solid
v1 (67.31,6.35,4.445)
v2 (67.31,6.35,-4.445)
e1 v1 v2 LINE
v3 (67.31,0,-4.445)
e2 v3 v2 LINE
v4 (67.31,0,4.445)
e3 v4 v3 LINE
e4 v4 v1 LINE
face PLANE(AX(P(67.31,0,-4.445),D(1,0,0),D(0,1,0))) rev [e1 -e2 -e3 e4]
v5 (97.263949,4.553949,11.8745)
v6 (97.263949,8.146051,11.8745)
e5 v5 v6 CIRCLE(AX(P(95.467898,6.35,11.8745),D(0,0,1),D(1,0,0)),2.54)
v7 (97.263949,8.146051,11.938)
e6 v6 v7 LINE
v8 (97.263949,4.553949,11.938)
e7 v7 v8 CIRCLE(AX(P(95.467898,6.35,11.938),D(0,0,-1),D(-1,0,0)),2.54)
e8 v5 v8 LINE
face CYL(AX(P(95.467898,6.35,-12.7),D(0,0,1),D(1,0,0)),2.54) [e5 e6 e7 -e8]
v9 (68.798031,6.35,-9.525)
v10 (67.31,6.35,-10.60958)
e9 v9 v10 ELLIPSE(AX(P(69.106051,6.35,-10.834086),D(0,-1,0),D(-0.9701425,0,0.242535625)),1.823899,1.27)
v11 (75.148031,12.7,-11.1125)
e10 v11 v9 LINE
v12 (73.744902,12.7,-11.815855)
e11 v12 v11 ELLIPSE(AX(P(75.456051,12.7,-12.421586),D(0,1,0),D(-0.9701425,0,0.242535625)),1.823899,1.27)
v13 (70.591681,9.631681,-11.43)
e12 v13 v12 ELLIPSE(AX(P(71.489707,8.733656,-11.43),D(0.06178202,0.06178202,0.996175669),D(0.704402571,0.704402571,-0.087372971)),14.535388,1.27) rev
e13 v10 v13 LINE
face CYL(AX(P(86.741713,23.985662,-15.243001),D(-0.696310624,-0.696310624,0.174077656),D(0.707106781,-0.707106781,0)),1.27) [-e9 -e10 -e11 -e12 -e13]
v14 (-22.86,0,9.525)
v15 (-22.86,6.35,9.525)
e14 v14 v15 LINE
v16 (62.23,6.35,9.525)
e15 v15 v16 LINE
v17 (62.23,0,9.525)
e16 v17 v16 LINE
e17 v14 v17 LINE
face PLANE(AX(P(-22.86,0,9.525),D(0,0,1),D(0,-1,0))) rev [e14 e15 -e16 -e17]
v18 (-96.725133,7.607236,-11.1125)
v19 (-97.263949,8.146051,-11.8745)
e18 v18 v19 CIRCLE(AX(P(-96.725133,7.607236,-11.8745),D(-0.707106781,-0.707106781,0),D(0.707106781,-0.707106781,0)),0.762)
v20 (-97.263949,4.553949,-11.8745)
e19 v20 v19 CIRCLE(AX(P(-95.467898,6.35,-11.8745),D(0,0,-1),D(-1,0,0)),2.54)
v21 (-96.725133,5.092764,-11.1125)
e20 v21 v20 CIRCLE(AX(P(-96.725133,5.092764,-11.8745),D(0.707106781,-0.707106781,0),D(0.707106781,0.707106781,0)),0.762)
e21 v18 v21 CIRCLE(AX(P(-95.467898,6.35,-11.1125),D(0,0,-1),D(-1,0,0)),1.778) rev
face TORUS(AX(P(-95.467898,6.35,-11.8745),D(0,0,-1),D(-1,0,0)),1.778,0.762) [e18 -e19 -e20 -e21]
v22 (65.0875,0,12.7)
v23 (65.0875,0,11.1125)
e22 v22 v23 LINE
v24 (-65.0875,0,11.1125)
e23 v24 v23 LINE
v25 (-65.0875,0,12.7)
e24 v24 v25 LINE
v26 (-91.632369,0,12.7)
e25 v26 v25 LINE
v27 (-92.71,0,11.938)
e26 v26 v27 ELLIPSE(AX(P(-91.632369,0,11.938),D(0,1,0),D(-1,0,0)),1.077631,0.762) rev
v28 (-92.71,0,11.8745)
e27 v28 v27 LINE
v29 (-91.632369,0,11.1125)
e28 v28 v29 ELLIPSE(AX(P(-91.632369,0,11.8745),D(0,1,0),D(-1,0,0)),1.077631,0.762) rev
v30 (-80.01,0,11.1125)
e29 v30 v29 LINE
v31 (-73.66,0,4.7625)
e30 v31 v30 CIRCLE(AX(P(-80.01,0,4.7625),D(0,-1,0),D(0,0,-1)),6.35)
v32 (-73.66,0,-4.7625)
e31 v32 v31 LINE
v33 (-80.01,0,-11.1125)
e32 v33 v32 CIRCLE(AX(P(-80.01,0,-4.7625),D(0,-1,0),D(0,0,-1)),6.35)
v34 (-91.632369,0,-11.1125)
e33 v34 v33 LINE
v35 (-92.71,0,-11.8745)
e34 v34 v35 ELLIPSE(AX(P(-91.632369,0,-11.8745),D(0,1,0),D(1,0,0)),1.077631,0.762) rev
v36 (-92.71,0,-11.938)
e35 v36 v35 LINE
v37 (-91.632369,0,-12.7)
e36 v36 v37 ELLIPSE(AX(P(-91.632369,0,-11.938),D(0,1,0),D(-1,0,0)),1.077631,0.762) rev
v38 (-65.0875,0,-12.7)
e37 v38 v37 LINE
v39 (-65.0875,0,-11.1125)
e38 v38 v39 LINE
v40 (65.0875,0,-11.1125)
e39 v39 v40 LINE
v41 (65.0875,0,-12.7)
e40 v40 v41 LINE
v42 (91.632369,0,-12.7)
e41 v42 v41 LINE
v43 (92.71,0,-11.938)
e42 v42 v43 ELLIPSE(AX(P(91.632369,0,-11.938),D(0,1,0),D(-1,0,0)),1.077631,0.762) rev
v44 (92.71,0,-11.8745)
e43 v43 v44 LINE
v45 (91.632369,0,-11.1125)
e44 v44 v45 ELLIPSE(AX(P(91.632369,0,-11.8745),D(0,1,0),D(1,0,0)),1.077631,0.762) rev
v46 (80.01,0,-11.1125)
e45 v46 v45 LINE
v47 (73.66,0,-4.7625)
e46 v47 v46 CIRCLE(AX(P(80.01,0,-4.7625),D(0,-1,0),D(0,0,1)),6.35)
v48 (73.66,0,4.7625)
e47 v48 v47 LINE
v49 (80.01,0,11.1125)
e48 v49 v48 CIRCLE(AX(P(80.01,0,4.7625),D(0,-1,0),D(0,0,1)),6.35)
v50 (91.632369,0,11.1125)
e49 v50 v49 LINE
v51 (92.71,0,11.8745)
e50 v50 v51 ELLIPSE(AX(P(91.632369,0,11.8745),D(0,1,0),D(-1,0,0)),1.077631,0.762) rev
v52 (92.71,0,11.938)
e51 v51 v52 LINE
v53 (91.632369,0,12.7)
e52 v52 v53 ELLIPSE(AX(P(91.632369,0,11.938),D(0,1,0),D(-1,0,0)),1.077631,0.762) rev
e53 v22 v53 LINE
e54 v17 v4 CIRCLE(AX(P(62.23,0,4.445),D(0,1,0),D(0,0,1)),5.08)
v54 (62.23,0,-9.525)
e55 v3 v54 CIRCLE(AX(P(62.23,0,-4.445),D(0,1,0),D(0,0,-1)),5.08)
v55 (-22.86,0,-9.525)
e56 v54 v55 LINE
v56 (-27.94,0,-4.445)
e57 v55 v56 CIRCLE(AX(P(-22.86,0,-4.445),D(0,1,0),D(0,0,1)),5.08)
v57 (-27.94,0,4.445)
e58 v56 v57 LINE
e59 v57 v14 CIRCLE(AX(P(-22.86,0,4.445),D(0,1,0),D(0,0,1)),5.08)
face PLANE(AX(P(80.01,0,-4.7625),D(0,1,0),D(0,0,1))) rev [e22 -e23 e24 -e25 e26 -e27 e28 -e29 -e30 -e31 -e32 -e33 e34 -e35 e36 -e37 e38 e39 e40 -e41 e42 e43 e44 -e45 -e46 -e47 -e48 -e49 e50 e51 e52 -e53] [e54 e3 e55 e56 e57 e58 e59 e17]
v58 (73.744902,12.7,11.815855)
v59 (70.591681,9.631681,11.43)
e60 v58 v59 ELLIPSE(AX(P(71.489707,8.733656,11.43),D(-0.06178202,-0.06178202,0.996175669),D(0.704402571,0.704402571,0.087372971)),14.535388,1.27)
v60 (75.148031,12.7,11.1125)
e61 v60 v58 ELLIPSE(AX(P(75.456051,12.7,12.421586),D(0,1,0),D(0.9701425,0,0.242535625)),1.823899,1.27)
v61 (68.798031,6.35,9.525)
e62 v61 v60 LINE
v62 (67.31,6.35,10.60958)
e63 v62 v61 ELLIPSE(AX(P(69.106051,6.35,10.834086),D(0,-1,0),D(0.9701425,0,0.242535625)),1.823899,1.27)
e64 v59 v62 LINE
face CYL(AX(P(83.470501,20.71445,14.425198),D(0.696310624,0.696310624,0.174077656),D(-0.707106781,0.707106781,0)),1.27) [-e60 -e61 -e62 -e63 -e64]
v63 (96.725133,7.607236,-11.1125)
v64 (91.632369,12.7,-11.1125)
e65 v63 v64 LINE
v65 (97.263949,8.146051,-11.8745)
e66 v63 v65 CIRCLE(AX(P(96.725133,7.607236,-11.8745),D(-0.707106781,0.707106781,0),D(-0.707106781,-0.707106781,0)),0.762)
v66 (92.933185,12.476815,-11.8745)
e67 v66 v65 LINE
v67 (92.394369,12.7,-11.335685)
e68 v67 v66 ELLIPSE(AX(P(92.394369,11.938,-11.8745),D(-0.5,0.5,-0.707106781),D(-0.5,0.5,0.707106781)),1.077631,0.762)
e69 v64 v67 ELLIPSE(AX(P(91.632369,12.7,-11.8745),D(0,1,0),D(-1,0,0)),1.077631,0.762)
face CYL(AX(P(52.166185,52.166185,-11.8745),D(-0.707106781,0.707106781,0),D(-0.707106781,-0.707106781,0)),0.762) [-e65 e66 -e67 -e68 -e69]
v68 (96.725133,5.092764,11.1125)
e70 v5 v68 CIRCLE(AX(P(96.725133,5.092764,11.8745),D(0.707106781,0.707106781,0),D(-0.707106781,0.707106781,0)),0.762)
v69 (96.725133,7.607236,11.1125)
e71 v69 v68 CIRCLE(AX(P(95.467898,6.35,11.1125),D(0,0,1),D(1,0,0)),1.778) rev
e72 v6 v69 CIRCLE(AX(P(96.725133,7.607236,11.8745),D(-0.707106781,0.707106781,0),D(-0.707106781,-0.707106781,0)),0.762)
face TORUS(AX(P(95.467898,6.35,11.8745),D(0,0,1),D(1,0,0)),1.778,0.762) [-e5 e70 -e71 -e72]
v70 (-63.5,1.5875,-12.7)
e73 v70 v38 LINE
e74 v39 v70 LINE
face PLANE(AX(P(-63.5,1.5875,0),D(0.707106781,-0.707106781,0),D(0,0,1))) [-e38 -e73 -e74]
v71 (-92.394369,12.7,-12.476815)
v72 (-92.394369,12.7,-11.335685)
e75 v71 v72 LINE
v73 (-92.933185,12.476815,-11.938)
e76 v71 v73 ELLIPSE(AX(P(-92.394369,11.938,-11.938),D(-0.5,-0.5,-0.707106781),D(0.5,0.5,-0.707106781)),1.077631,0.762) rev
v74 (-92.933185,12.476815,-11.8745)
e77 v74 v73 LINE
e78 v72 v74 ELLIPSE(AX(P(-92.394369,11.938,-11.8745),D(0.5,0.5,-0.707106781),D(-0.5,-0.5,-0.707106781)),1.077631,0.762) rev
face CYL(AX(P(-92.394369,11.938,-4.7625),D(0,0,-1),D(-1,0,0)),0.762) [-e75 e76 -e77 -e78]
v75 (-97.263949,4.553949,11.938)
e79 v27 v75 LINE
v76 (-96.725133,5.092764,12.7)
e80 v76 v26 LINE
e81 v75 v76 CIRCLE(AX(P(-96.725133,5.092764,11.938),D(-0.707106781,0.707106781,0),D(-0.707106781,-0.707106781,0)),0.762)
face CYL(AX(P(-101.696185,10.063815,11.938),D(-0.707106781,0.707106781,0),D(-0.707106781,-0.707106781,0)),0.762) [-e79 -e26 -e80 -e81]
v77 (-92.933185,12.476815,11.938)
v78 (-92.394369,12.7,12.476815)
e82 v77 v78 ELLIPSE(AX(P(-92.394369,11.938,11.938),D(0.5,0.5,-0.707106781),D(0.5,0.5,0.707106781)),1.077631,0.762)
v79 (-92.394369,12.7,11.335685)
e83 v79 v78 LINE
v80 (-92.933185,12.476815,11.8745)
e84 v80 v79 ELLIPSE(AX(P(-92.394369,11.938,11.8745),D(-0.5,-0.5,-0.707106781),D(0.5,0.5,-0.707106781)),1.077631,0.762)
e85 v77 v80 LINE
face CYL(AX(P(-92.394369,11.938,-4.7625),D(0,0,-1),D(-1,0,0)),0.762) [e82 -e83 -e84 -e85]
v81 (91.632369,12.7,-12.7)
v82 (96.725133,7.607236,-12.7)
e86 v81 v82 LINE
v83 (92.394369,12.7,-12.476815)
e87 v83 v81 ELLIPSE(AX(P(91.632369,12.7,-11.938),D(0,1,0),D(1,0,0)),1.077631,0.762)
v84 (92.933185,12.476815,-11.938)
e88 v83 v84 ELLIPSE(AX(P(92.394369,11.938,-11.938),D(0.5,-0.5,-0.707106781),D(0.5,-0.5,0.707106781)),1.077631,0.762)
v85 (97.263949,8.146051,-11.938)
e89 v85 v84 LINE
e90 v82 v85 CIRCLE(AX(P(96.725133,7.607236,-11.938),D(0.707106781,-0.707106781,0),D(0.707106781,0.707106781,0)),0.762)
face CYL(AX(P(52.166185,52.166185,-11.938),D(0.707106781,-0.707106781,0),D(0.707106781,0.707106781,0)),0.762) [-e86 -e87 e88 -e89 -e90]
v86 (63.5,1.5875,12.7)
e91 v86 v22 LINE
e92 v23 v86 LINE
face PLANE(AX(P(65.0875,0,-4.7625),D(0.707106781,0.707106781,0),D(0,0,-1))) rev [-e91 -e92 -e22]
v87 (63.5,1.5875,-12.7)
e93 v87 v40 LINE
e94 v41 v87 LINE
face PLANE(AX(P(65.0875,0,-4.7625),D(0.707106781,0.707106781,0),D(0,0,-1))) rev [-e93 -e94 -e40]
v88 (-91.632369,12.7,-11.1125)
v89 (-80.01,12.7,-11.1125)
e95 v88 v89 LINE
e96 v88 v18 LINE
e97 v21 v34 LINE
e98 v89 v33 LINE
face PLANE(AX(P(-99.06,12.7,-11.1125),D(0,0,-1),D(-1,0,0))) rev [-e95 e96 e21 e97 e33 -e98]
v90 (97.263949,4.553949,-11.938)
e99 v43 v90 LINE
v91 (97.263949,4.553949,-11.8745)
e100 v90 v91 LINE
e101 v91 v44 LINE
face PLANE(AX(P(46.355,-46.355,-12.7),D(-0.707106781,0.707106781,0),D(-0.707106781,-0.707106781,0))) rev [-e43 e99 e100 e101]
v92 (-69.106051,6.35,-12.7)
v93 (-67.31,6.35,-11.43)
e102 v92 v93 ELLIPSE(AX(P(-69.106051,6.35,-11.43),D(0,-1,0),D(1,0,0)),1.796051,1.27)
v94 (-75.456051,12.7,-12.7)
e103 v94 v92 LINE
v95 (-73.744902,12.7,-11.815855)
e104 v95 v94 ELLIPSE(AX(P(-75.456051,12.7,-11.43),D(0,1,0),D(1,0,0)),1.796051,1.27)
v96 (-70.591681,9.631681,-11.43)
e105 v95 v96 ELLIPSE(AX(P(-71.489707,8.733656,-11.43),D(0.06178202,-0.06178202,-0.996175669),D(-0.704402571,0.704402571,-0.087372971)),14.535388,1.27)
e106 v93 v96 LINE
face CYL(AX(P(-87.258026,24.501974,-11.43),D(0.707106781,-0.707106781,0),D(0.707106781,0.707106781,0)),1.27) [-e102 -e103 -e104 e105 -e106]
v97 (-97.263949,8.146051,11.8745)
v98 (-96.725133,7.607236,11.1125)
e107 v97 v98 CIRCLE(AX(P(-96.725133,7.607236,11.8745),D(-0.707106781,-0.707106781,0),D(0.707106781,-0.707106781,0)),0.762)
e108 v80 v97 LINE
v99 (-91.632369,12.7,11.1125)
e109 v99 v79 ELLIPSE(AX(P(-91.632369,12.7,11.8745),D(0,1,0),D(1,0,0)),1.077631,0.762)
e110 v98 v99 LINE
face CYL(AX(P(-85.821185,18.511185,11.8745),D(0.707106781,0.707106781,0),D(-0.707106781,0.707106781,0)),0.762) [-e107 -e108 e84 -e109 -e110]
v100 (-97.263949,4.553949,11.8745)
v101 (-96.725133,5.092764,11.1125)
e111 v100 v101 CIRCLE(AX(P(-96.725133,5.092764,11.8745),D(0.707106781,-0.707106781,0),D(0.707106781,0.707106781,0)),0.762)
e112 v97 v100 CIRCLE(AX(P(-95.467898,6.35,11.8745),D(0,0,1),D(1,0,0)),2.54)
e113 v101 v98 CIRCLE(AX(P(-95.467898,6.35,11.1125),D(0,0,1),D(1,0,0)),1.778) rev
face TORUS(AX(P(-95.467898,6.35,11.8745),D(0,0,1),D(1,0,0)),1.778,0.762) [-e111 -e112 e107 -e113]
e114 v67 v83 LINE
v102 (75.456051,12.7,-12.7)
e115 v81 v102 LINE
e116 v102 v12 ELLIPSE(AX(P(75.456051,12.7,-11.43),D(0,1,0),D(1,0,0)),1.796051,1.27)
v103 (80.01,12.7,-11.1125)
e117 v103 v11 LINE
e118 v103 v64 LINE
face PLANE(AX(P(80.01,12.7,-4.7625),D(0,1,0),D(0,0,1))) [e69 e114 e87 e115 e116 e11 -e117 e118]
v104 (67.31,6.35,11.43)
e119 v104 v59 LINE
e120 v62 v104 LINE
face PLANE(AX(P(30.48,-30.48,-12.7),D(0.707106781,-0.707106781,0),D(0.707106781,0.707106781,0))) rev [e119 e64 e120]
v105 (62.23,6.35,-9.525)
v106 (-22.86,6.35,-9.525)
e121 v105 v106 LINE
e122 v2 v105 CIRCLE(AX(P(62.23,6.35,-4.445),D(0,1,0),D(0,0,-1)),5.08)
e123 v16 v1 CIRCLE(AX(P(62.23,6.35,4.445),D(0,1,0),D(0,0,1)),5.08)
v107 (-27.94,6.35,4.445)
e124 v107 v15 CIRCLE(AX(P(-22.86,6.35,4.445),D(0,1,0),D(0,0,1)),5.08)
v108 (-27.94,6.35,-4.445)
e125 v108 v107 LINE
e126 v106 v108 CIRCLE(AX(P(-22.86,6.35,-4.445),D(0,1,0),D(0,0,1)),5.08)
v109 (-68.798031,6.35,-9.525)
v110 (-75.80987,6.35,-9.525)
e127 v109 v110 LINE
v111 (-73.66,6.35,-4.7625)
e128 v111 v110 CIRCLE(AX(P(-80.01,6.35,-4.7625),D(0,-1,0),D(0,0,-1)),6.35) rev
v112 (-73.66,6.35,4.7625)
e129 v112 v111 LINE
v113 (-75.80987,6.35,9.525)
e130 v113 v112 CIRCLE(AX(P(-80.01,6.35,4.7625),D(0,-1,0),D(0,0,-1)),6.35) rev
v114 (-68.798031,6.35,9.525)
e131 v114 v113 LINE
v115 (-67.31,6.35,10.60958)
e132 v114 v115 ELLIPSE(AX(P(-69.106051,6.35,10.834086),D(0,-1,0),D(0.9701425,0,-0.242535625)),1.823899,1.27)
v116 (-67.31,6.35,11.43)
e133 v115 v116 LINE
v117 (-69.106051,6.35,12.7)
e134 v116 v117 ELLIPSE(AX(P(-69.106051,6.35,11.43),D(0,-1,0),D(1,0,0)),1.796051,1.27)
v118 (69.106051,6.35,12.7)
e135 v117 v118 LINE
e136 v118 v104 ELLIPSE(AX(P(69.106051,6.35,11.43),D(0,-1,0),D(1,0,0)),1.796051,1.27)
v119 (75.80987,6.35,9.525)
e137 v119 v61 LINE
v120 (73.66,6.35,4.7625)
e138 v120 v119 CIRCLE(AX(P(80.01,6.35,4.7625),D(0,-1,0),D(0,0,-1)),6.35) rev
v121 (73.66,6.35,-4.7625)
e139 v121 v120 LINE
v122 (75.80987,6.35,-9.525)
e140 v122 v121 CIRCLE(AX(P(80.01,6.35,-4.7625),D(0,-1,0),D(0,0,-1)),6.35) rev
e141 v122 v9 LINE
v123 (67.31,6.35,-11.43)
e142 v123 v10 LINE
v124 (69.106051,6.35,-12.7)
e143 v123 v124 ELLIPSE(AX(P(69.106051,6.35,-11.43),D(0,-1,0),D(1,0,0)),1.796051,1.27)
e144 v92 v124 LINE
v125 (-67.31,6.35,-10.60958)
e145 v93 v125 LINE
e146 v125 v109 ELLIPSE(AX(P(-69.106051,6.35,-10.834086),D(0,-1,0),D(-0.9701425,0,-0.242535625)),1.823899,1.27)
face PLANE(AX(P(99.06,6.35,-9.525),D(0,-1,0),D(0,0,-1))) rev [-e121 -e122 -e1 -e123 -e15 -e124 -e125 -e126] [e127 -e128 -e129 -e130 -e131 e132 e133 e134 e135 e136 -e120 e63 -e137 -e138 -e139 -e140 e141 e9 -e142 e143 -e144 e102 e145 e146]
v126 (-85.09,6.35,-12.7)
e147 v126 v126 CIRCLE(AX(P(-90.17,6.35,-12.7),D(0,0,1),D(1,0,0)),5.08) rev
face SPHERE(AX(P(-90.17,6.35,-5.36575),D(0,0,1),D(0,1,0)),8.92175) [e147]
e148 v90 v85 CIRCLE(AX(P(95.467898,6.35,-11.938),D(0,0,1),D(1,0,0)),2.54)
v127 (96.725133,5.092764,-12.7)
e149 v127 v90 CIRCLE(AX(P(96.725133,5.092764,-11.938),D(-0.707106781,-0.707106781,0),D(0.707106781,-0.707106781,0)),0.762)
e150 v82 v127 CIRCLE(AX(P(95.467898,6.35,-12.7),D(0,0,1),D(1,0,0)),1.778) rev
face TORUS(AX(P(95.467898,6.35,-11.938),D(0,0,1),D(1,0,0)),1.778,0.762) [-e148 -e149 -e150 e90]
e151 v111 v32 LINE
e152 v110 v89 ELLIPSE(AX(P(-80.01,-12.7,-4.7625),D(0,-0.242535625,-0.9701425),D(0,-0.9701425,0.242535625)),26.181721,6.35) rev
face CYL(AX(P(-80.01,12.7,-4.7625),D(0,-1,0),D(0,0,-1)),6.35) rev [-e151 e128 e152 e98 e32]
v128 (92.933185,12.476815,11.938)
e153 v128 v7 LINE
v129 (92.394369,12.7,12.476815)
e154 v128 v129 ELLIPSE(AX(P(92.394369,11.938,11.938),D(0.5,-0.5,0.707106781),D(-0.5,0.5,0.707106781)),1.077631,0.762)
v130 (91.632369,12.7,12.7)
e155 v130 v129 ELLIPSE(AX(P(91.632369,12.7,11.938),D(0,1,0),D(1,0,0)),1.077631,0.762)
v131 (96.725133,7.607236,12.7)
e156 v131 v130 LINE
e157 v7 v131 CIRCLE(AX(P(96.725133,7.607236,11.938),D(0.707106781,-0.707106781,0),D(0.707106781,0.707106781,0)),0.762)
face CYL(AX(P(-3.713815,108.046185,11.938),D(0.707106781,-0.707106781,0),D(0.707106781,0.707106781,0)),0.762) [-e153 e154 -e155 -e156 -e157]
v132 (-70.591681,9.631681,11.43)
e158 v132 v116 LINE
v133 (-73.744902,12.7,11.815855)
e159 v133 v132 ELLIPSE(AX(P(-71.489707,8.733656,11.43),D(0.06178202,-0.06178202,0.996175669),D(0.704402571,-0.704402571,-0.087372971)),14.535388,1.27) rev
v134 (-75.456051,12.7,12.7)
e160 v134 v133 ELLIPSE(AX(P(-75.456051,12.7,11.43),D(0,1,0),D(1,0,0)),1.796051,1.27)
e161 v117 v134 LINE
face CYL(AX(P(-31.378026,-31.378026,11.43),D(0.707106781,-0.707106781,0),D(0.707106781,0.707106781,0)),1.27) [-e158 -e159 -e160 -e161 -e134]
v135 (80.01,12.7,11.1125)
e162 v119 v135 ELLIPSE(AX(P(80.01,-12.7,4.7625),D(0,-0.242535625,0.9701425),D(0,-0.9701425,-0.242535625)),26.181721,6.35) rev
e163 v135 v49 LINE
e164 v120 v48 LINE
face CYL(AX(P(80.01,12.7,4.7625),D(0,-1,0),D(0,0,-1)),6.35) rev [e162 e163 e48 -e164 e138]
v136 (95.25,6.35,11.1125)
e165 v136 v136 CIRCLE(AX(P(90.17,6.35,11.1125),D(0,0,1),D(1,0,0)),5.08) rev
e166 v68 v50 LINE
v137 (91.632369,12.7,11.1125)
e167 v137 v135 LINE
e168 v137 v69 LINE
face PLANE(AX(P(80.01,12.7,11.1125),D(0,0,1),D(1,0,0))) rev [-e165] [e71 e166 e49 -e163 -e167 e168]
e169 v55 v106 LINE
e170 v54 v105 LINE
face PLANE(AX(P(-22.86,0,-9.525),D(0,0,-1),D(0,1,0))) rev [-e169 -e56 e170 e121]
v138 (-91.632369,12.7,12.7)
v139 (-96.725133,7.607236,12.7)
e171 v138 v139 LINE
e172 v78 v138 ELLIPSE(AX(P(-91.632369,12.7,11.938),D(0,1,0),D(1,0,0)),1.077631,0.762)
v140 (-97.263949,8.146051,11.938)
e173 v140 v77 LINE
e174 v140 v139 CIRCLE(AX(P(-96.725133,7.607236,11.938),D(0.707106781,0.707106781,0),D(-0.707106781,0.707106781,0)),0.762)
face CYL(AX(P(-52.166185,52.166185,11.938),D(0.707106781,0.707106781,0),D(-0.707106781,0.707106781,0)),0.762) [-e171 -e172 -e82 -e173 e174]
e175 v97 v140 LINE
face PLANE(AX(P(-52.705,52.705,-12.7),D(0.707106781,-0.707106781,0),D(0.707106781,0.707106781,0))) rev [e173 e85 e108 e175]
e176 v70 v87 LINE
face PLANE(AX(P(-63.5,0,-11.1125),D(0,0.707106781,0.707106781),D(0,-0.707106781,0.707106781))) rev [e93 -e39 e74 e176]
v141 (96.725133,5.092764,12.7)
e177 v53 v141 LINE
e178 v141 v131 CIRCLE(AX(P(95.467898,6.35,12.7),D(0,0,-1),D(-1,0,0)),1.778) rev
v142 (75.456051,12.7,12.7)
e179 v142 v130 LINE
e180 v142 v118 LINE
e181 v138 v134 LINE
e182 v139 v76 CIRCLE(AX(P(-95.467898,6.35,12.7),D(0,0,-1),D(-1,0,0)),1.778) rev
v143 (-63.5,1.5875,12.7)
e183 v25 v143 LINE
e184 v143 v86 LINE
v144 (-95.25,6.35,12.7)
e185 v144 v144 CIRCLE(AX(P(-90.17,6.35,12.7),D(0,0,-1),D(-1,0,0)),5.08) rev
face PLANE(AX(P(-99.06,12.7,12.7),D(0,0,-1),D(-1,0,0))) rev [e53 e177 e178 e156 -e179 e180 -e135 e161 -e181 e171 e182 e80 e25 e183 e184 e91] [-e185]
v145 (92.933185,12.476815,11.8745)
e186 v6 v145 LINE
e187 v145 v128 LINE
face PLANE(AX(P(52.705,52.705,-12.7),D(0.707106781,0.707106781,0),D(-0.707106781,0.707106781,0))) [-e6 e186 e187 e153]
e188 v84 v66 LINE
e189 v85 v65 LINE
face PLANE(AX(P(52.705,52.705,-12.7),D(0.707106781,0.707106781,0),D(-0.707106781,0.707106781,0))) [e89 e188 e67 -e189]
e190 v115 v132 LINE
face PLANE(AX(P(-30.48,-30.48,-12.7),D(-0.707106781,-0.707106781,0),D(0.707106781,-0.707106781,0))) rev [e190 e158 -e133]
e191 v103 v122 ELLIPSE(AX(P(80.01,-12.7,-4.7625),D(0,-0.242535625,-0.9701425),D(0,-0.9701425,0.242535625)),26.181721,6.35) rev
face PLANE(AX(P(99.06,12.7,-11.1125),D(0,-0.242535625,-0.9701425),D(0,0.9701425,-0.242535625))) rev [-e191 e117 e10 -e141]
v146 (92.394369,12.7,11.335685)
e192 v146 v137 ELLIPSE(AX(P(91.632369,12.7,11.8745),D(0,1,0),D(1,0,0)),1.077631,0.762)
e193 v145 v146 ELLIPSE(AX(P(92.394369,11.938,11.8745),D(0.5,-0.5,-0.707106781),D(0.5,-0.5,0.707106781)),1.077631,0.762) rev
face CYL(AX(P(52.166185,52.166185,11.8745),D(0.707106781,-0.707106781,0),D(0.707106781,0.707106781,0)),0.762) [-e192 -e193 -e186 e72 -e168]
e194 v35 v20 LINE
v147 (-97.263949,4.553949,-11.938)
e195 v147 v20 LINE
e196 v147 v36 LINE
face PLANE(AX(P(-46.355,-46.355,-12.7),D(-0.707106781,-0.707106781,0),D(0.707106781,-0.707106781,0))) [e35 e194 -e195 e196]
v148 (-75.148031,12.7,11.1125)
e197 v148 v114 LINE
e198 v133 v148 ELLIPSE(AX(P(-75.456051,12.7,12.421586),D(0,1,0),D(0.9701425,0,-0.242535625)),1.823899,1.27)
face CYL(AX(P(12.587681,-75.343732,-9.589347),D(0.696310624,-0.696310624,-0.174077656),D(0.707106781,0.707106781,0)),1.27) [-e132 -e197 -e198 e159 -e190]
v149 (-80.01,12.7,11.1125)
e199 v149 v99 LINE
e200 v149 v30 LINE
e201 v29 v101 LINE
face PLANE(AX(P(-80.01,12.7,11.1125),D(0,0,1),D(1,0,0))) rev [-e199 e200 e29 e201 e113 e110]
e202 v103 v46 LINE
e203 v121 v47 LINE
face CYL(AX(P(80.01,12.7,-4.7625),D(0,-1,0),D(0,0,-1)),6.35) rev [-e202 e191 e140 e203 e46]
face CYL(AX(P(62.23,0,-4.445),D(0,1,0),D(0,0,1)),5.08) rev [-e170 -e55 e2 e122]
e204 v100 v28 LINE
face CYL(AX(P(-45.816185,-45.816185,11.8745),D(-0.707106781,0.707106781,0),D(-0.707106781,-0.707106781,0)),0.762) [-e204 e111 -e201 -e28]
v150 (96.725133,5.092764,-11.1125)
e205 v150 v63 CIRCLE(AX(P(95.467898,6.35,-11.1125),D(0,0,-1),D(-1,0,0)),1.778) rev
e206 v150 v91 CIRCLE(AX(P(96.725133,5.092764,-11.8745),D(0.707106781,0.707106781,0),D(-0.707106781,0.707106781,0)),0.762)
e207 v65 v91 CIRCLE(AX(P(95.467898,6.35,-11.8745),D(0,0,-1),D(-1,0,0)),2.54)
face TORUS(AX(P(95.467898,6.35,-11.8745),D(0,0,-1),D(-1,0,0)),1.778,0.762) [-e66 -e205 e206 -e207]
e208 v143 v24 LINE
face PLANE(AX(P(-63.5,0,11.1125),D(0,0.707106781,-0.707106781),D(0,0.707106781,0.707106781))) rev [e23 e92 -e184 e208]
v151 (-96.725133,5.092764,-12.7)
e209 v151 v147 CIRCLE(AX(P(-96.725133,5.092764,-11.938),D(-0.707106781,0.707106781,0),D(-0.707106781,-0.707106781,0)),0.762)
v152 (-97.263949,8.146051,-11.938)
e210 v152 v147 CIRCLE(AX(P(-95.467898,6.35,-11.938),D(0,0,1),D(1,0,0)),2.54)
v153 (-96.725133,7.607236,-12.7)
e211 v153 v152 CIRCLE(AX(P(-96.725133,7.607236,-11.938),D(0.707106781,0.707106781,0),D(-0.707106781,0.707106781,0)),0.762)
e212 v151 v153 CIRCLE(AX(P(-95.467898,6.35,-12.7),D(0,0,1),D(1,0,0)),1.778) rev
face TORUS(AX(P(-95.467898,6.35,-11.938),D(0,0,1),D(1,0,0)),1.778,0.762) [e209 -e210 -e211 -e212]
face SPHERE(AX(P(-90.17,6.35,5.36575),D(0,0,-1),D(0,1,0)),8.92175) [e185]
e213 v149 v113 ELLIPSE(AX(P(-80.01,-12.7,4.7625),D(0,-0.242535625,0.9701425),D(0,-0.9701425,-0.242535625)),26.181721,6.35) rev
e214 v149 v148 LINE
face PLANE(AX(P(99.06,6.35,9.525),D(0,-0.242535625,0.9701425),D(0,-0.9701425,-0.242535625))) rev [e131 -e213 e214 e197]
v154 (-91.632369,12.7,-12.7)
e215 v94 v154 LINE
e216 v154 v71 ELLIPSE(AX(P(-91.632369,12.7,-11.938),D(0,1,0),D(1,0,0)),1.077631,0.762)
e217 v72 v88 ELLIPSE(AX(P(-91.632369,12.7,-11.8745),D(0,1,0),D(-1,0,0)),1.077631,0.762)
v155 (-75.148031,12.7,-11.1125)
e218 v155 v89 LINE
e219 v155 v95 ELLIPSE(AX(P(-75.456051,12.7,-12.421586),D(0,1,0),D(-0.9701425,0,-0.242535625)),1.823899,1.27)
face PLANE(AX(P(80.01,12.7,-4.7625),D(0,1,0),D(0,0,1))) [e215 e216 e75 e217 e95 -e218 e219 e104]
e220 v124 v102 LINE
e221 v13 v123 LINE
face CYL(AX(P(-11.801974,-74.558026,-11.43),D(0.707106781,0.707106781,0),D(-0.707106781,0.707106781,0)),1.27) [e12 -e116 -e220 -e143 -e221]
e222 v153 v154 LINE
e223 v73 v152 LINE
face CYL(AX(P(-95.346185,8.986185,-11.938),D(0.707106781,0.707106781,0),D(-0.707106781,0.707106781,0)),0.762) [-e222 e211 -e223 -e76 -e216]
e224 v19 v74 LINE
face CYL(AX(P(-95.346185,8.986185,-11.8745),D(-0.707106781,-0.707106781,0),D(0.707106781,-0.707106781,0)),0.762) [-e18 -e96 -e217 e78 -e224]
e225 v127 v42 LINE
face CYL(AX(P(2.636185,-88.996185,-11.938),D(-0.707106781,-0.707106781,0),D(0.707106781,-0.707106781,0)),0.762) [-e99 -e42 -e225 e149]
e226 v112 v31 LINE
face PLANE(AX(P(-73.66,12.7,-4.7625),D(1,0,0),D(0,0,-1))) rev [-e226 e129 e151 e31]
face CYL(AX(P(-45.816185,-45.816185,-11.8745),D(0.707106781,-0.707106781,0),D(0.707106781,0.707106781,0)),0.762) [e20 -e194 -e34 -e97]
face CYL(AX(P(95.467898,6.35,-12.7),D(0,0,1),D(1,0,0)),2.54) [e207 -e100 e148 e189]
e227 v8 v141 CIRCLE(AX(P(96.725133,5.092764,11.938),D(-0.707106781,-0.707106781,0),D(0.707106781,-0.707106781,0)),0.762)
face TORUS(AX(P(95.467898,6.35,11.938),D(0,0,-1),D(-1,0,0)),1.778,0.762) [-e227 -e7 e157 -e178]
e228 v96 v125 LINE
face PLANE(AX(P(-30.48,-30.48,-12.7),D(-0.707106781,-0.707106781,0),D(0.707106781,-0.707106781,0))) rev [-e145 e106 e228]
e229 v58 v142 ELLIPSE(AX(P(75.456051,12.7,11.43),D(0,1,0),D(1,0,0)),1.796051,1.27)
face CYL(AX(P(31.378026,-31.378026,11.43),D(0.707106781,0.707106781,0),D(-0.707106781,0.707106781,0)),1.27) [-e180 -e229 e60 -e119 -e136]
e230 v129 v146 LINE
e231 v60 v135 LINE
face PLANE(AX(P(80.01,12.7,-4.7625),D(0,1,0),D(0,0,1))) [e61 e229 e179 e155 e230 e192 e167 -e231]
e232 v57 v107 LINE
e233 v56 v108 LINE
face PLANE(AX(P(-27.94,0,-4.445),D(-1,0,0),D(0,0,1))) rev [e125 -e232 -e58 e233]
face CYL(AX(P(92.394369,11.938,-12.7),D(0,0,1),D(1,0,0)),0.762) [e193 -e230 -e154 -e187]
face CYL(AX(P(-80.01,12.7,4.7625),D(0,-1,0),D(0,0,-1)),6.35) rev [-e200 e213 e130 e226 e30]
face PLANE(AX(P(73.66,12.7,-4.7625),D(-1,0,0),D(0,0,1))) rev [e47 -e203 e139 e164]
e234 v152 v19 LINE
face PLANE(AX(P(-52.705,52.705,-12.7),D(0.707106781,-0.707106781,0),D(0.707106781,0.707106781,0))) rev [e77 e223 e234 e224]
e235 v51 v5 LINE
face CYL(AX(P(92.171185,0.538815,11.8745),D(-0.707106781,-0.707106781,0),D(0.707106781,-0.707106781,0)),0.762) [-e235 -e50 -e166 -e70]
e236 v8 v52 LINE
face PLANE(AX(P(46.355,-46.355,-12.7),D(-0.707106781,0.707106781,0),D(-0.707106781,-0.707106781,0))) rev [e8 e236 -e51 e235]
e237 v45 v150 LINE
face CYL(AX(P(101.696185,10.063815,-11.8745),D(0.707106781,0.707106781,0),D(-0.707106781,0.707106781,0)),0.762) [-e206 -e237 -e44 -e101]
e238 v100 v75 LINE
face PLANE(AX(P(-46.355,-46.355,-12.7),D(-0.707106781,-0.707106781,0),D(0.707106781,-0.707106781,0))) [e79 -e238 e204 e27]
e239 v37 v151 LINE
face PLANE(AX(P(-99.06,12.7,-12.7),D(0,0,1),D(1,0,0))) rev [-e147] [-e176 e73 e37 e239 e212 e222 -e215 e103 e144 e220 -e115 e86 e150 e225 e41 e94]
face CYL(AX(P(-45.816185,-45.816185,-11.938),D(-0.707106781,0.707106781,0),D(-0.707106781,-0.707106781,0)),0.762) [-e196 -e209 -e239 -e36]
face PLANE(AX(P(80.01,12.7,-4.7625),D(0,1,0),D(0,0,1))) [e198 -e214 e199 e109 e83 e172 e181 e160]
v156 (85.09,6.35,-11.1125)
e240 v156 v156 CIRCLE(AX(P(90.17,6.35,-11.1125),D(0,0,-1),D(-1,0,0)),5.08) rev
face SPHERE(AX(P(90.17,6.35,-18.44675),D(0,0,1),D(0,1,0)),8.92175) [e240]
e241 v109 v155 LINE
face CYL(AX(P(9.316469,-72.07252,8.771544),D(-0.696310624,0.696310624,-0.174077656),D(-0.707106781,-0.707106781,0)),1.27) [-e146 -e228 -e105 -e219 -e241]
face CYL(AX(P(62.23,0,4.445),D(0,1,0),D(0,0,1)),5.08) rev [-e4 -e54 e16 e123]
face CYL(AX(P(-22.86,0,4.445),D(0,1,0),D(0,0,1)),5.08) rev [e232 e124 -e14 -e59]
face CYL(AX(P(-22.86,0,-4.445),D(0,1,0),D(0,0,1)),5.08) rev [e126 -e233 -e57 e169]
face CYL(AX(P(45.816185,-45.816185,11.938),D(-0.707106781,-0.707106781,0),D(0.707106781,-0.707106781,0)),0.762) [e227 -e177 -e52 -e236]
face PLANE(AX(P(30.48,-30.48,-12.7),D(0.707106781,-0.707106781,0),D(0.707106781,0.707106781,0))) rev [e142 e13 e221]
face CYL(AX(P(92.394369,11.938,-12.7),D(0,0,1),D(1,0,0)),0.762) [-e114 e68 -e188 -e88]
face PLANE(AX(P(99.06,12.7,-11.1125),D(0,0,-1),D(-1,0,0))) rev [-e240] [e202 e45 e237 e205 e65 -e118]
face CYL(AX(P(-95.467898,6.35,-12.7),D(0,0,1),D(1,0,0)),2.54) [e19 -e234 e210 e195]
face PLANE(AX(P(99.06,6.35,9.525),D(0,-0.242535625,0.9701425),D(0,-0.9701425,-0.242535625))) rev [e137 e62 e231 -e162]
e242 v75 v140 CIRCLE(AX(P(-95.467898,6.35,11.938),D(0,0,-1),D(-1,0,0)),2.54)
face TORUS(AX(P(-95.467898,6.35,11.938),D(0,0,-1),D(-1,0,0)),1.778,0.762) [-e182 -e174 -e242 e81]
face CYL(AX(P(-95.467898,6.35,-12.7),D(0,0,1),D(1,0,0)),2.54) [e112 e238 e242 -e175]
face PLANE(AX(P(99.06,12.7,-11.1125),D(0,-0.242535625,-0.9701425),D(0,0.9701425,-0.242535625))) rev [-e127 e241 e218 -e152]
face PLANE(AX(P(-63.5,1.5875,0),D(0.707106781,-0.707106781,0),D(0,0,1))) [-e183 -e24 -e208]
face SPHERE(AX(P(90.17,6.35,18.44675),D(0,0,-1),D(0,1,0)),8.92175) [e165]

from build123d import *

# Parameters (mm, degrees)
BOSS_EXTRUDE1_DEPTH = 12.7
CUT_EXTRUDE2_DEPTH  = 199.932436772
CUT_EXTRUDE1_DEPTH  = 104.050150898
CUT_EXTRUDE3_DEPTH  = 63.5
CHAMFER1_SIZE       = 1.5875
FILLET1_R           = 0.762
FILLET2_R           = 1.27
CUT_EXTRUDE4_DEPTH  = 100.247182118


# Some blends are built 0.0001 mm under size
with BuildPart() as part:
    # Sketch1 → Boss-Extrude1 (new body)
    with BuildSketch(Plane(origin=(0, 0, 0), x_dir=(1, 0, 0), z_dir=(0, 1, 0))):
        with BuildLine():
            Line((-99.06, -12.7), (99.06, -12.7))
            Line((99.06, -12.7), (99.06, -11.1125))
            Line((99.06, -11.1125), (80.01, -11.1125))
            ThreePointArc((80.01, -11.1125), (75.519871939, -9.252628061), (73.66, -4.7625))
            Line((73.66, -4.7625), (73.66, 4.7625))
            ThreePointArc((73.66, 4.7625), (75.519871939, 9.252628061), (80.01, 11.1125))
            Line((80.01, 11.1125), (99.06, 11.1125))
            Line((99.06, 11.1125), (99.06, 12.7))
            Line((99.06, 12.7), (-99.06, 12.7))
            Line((-99.06, 12.7), (-99.06, 11.1125))
            Line((-99.06, 11.1125), (-80.01, 11.1125))
            ThreePointArc((-80.01, 11.1125), (-75.519871939, 9.252628061), (-73.66, 4.7625))
            Line((-73.66, 4.7625), (-73.66, -4.7625))
            ThreePointArc((-73.66, -4.7625), (-75.519871939, -9.252628061), (-80.01, -11.1125))
            Line((-80.01, -11.1125), (-99.06, -11.1125))
            Line((-99.06, -11.1125), (-99.06, -12.7))
        make_face()
    extrude(amount=BOSS_EXTRUDE1_DEPTH)

    # Sketch3 → Cut-Extrude2 (cut, through all)
    with BuildSketch(Plane.ZY.offset(99.06)):
        Polygon((11.1125, 12.7), (4.7625, 12.7), (-4.7625, 12.7), (-11.1125, 12.7), (-9.525, 6.35), (9.525, 6.35), align=None)
    extrude(amount=-CUT_EXTRUDE2_DEPTH, mode=Mode.SUBTRACT)

    # Sketch2 → Cut-Extrude1 (cut, through all)
    with BuildSketch(Plane.XY.offset(12.7)):
        Polygon((73.66, 12.7), (-73.66, 12.7), (-67.31, 6.35), (67.31, 6.35), align=None)
        with BuildLine():
            Line((97.263948776, 4.553948776), (92.71, 0))
            Line((92.71, 0), (99.06, 0))
            Line((99.06, 0), (99.06, 12.7))
            Line((99.06, 12.7), (92.71, 12.7))
            Line((92.71, 12.7), (97.263948776, 8.146051224))
            ThreePointArc((97.263948776, 8.146051224), (98.007897552, 6.35), (97.263948776, 4.553948776))
        make_face()
        with BuildLine():
            ThreePointArc((-97.263948776, 4.553948776), (-98.007897552, 6.35), (-97.263948776, 8.146051224))
            Line((-97.263948776, 8.146051224), (-92.71, 12.7))
            Line((-92.71, 12.7), (-99.06, 12.7))
            Line((-99.06, 12.7), (-99.06, 0))
            Line((-99.06, 0), (-92.71, 0))
            Line((-92.71, 0), (-97.263948776, 4.553948776))
        make_face()
    extrude(amount=-CUT_EXTRUDE1_DEPTH, mode=Mode.SUBTRACT)

    # Sketch4 → Revolve1 (revolve)
    with BuildSketch(Plane.ZY.offset(90.17)):
        with BuildLine():
            Line((12.7, 6.35), (12.7, 11.43))
            ThreePointArc((12.7, 11.43), (13.881381744, 9.01113492), (14.2875, 6.35))
            Line((14.2875, 6.35), (12.7, 6.35))
        make_face()
    revolve1 = revolve(axis=Axis((-90.17, 6.35, 0), (0, 0, 1)))

    # Mirror1: Revolve1 across plane
    add(revolve1.mirror(Plane.XY))

    # Sketch5 → Revolve2 (revolve)
    with BuildSketch(Plane(origin=(90.17, 0, 0), x_dir=(0, 0, -1), z_dir=(1, 0, 0))):
        with BuildLine():
            Line((11.1125, 6.35), (11.1125, 11.43))
            ThreePointArc((11.1125, 11.43), (9.931118256, 9.01113492), (9.525, 6.35))
            Line((9.525, 6.35), (11.1125, 6.35))
        make_face()
    revolve2 = revolve(axis=Axis((90.17, 6.35, 0), (0, 0, -1)))

    # Mirror2: Revolve2 across plane
    add(revolve2.mirror(Plane.XY))

    # Sketch6 → Cut-Extrude3 (cut, symmetric)
    with BuildSketch(Plane(origin=(0, 0, 0), x_dir=(0, 0, -1), z_dir=(1, 0, 0))):
        Polygon((-12.7, 0), (-11.1125, 0), (-12.7, 1.5875), align=None)
        Polygon((11.1125, 0), (12.7, 1.5875), (12.7, 0), align=None)
    extrude(amount=CUT_EXTRUDE3_DEPTH, both=True, mode=Mode.SUBTRACT)

    # Chamfer1
    chamfer1_edges = [part.edges().sort_by_distance(p)[0] for p in [
        (63.5, 0, 11.90625),
        (63.5, 0, -11.90625),
        (-63.5, 0, -11.90625),
        (-63.5, 0, 11.90625),
    ]]
    chamfer(chamfer1_edges, length=CHAMFER1_SIZE - 0.0001)  # a hair under: the kernel refuses the full size

    # Fillet1
    fillet1_edges = [part.edges().sort_by_distance(p)[0] for p in [
        (-98.007897552, 6.35, 12.7),
        (-92.71, 12.7, -11.90625),
        (-94.986974388, 10.423025612, -11.1125),
        (-94.986974388, 10.423025612, -12.7),
        (-94.986974388, 10.423025612, 11.1125),
        (-92.71, 12.7, 11.90625),
        (-94.986974388, 2.276974388, 12.7),
        (-98.007897552, 6.35, -11.1125),
        (-98.007897552, 6.35, 11.1125),
        (-94.986974388, 2.276974388, -11.1125),
        (-94.986974388, 2.276974388, 11.1125),
        (-98.007897552, 6.35, -12.7),
        (-94.986974388, 2.276974388, -12.7),
        (-94.986974388, 10.423025612, 12.7),
        (98.007897552, 6.35, 12.7),
        (92.71, 12.7, 11.90625),
        (92.71, 12.7, -11.90625),
        (94.986974388, 10.423025612, 12.7),
        (94.986974388, 2.276974388, 11.1125),
        (94.986974388, 2.276974388, -11.1125),
        (94.986974388, 2.276974388, -12.7),
        (98.007897552, 6.35, 11.1125),
        (94.986974388, 10.423025612, 11.1125),
        (94.986974388, 10.423025612, -11.1125),
        (98.007897552, 6.35, -12.7),
        (94.986974388, 10.423025612, -12.7),
        (94.986974388, 2.276974388, 12.7),
        (98.007897552, 6.35, -11.1125),
    ]]
    fillet(fillet1_edges, radius=FILLET1_R)

    # Fillet2
    # the kernel refuses this fillet: 1.27 mm, written as the material it takes off along each edge
    with BuildSketch(Plane(origin=(-75.90506403, 14.94506403, -12.7), x_dir=(-0.7071067811865446, -0.7071067811865505, 0), z_dir=(0.7071067811865506, -0.7071067811865446, 0))) as fillet2_piece_1_section:
        with BuildLine():
            CenterArc((FILLET2_R, -FILLET2_R), FILLET2_R, 90, 90)
            Line((0, -FILLET2_R), (0, 0))
            Line((0, 0), (FILLET2_R, 0))
        make_face()
    fillet2_piece_1 = extrude(amount=15.330256121, mode=Mode.PRIVATE)
    fillet2_piece_1 = split(fillet2_piece_1, bisect_by=Plane(origin=(-71.905795305, 6.35, -12.408746665), z_dir=(0, 1, 0)), keep=Keep.TOP, mode=Mode.PRIVATE)
    add(fillet2_piece_1, mode=Mode.SUBTRACT)
    with BuildSketch(Plane(origin=(-65.450815483, 4.490815483, -9.060203871), x_dir=(0.1230914909792504, -0.12309149097924957, -0.9847319278346824), z_dir=(-0.696310623822809, 0.6963106238228031, -0.17407765595558086))) as fillet2_piece_2_section:
        with BuildLine():
            CenterArc((FILLET2_R * 0.840960781889, FILLET2_R), FILLET2_R, 189.874961398, 80.125038602)
            Line((-FILLET2_R * 0.144223584254, FILLET2_R * 0.828501414858), (0, 0))
            Line((0, 0), (FILLET2_R * 0.840960781889, 0))
        make_face()
    fillet2_piece_2 = extrude(amount=14.459594166, mode=Mode.PRIVATE)
    fillet2_piece_2 = split(fillet2_piece_2, bisect_by=Plane(origin=(-71.646234354, 6.35, -10.770930609), z_dir=(0, 1, 0)), keep=Keep.TOP, mode=Mode.PRIVATE)
    add(fillet2_piece_2, mode=Mode.SUBTRACT)
    with BuildSketch(Plane(origin=(-75.519184517, 14.559184517, 11.577296129), x_dir=(-0.7177405625652845, -0.6755205294731655, -0.1688801323683837), z_dir=(0.69631062382278, -0.6963106238227741, -0.17407765595581334))) as fillet2_piece_3_section:
        with BuildLine():
            CenterArc((FILLET2_R * 0.840960781889, -FILLET2_R), FILLET2_R, 90, 80.125038602)
            Line((-FILLET2_R * 0.144223584254, -FILLET2_R * 0.828501414857), (0, 0))
            Line((0, 0), (FILLET2_R * 0.840960781889, 0))
        make_face()
    fillet2_piece_3 = extrude(amount=14.459594166, mode=Mode.PRIVATE)
    fillet2_piece_3 = split(fillet2_piece_3, bisect_by=Plane(origin=(-71.646234354, 6.35, 10.770930609), z_dir=(0, 1, 0)), keep=Keep.TOP, mode=Mode.PRIVATE)
    add(fillet2_piece_3, mode=Mode.SUBTRACT)
    with BuildSketch(Plane(origin=(-75.90506403, 14.94506403, 12.7), x_dir=(-0.7071067811865445, -0.7071067811865505, 0), z_dir=(0.7071067811865506, -0.7071067811865446, 0))) as fillet2_piece_4_section:
        with BuildLine():
            CenterArc((FILLET2_R, FILLET2_R), FILLET2_R, 180, 90)
            Line((0, FILLET2_R), (0, 0))
            Line((0, 0), (FILLET2_R, 0))
        make_face()
    fillet2_piece_4 = extrude(amount=15.330256121, mode=Mode.PRIVATE)
    fillet2_piece_4 = split(fillet2_piece_4, bisect_by=Plane(origin=(-71.905795305, 6.35, 12.408746665), z_dir=(0, 1, 0)), keep=Keep.TOP, mode=Mode.PRIVATE)
    add(fillet2_piece_4, mode=Mode.SUBTRACT)
    with BuildSketch(Plane(origin=(65.06493597, 4.10493597, -12.7), x_dir=(0.7071067811865445, -0.7071067811865506, 0), z_dir=(0.7071067811865506, 0.7071067811865445, 0))) as fillet2_piece_5_section:
        with BuildLine():
            CenterArc((FILLET2_R, -FILLET2_R), FILLET2_R, 90, 90)
            Line((0, -FILLET2_R), (0, 0))
            Line((0, 0), (FILLET2_R, 0))
        make_face()
    fillet2_piece_5 = extrude(amount=15.330256121, mode=Mode.PRIVATE)
    fillet2_piece_5 = split(fillet2_piece_5, bisect_by=Plane(origin=(71.905795305, 6.35, -12.408746665), z_dir=(0, 1, 0)), keep=Keep.TOP, mode=Mode.PRIVATE)
    add(fillet2_piece_5, mode=Mode.SUBTRACT)
    with BuildSketch(Plane(origin=(75.519184517, 14.559184517, -11.577296129), x_dir=(-0.12309149097927001, -0.12309149097926336, -0.9847319278346782), z_dir=(-0.6963106238228061, -0.6963106238228001, 0.17407765595560445))) as fillet2_piece_6_section:
        with BuildLine():
            CenterArc((FILLET2_R * 0.840960781889, FILLET2_R), FILLET2_R, 189.874961398, 80.125038602)
            Line((-FILLET2_R * 0.144223584254, FILLET2_R * 0.828501414858), (0, 0))
            Line((0, 0), (FILLET2_R * 0.84096078189, 0))
        make_face()
    fillet2_piece_6 = extrude(amount=14.459594166, mode=Mode.PRIVATE)
    fillet2_piece_6 = split(fillet2_piece_6, bisect_by=Plane(origin=(71.646234354, 6.35, -10.770930609), z_dir=(0, 1, 0)), keep=Keep.TOP, mode=Mode.PRIVATE)
    add(fillet2_piece_6, mode=Mode.SUBTRACT)
    with BuildSketch(Plane(origin=(65.06493597, 4.10493597, 12.7), x_dir=(0.7071067811865445, -0.7071067811865507, 0), z_dir=(0.7071067811865506, 0.7071067811865445, 0))) as fillet2_piece_7_section:
        with BuildLine():
            CenterArc((FILLET2_R, FILLET2_R), FILLET2_R, 180, 90)
            Line((0, FILLET2_R), (0, 0))
            Line((0, 0), (FILLET2_R, 0))
        make_face()
    fillet2_piece_7 = extrude(amount=15.330256121, mode=Mode.PRIVATE)
    fillet2_piece_7 = split(fillet2_piece_7, bisect_by=Plane(origin=(71.905795305, 6.35, 12.408746665), z_dir=(0, 1, 0)), keep=Keep.TOP, mode=Mode.PRIVATE)
    add(fillet2_piece_7, mode=Mode.SUBTRACT)
    with BuildSketch(Plane(origin=(65.450815483, 4.490815483, 9.060203871), x_dir=(0.7177405625652817, -0.6755205294731627, -0.16888013236840813), z_dir=(0.6963106238227829, 0.6963106238227769, 0.1740776559557897))) as fillet2_piece_8_section:
        with BuildLine():
            CenterArc((FILLET2_R * 0.840960781889, -FILLET2_R), FILLET2_R, 90, 80.125038602)
            Line((-FILLET2_R * 0.144223584254, -FILLET2_R * 0.828501414857), (0, 0))
            Line((0, 0), (FILLET2_R * 0.840960781889, 0))
        make_face()
    fillet2_piece_8 = extrude(amount=14.459594166, mode=Mode.PRIVATE)
    fillet2_piece_8 = split(fillet2_piece_8, bisect_by=Plane(origin=(71.646234354, 6.35, 10.770930609), z_dir=(0, 1, 0)), keep=Keep.TOP, mode=Mode.PRIVATE)
    add(fillet2_piece_8, mode=Mode.SUBTRACT)

    # Sketch7 → Cut-Extrude4 (cut, through all)
    with BuildSketch(Plane(origin=(0, 6.35, 0), x_dir=(1, 0, 0), z_dir=(0, 1, 0))):
        with BuildLine():
            Line((-22.86, 9.525), (62.23, 9.525))
            ThreePointArc((62.23, 9.525), (65.822102448, 8.037102448), (67.31, 4.445))
            Line((67.31, 4.445), (67.31, -4.445))
            ThreePointArc((67.31, -4.445), (65.822102448, -8.037102448), (62.23, -9.525))
            Line((62.23, -9.525), (-22.86, -9.525))
            ThreePointArc((-22.86, -9.525), (-26.452102448, -8.037102448), (-27.94, -4.445))
            Line((-27.94, -4.445), (-27.94, 4.445))
            ThreePointArc((-27.94, 4.445), (-26.452102448, 8.037102448), (-22.86, 9.525))
        make_face()
    extrude(amount=-CUT_EXTRUDE4_DEPTH, mode=Mode.SUBTRACT)


solid = part.part
